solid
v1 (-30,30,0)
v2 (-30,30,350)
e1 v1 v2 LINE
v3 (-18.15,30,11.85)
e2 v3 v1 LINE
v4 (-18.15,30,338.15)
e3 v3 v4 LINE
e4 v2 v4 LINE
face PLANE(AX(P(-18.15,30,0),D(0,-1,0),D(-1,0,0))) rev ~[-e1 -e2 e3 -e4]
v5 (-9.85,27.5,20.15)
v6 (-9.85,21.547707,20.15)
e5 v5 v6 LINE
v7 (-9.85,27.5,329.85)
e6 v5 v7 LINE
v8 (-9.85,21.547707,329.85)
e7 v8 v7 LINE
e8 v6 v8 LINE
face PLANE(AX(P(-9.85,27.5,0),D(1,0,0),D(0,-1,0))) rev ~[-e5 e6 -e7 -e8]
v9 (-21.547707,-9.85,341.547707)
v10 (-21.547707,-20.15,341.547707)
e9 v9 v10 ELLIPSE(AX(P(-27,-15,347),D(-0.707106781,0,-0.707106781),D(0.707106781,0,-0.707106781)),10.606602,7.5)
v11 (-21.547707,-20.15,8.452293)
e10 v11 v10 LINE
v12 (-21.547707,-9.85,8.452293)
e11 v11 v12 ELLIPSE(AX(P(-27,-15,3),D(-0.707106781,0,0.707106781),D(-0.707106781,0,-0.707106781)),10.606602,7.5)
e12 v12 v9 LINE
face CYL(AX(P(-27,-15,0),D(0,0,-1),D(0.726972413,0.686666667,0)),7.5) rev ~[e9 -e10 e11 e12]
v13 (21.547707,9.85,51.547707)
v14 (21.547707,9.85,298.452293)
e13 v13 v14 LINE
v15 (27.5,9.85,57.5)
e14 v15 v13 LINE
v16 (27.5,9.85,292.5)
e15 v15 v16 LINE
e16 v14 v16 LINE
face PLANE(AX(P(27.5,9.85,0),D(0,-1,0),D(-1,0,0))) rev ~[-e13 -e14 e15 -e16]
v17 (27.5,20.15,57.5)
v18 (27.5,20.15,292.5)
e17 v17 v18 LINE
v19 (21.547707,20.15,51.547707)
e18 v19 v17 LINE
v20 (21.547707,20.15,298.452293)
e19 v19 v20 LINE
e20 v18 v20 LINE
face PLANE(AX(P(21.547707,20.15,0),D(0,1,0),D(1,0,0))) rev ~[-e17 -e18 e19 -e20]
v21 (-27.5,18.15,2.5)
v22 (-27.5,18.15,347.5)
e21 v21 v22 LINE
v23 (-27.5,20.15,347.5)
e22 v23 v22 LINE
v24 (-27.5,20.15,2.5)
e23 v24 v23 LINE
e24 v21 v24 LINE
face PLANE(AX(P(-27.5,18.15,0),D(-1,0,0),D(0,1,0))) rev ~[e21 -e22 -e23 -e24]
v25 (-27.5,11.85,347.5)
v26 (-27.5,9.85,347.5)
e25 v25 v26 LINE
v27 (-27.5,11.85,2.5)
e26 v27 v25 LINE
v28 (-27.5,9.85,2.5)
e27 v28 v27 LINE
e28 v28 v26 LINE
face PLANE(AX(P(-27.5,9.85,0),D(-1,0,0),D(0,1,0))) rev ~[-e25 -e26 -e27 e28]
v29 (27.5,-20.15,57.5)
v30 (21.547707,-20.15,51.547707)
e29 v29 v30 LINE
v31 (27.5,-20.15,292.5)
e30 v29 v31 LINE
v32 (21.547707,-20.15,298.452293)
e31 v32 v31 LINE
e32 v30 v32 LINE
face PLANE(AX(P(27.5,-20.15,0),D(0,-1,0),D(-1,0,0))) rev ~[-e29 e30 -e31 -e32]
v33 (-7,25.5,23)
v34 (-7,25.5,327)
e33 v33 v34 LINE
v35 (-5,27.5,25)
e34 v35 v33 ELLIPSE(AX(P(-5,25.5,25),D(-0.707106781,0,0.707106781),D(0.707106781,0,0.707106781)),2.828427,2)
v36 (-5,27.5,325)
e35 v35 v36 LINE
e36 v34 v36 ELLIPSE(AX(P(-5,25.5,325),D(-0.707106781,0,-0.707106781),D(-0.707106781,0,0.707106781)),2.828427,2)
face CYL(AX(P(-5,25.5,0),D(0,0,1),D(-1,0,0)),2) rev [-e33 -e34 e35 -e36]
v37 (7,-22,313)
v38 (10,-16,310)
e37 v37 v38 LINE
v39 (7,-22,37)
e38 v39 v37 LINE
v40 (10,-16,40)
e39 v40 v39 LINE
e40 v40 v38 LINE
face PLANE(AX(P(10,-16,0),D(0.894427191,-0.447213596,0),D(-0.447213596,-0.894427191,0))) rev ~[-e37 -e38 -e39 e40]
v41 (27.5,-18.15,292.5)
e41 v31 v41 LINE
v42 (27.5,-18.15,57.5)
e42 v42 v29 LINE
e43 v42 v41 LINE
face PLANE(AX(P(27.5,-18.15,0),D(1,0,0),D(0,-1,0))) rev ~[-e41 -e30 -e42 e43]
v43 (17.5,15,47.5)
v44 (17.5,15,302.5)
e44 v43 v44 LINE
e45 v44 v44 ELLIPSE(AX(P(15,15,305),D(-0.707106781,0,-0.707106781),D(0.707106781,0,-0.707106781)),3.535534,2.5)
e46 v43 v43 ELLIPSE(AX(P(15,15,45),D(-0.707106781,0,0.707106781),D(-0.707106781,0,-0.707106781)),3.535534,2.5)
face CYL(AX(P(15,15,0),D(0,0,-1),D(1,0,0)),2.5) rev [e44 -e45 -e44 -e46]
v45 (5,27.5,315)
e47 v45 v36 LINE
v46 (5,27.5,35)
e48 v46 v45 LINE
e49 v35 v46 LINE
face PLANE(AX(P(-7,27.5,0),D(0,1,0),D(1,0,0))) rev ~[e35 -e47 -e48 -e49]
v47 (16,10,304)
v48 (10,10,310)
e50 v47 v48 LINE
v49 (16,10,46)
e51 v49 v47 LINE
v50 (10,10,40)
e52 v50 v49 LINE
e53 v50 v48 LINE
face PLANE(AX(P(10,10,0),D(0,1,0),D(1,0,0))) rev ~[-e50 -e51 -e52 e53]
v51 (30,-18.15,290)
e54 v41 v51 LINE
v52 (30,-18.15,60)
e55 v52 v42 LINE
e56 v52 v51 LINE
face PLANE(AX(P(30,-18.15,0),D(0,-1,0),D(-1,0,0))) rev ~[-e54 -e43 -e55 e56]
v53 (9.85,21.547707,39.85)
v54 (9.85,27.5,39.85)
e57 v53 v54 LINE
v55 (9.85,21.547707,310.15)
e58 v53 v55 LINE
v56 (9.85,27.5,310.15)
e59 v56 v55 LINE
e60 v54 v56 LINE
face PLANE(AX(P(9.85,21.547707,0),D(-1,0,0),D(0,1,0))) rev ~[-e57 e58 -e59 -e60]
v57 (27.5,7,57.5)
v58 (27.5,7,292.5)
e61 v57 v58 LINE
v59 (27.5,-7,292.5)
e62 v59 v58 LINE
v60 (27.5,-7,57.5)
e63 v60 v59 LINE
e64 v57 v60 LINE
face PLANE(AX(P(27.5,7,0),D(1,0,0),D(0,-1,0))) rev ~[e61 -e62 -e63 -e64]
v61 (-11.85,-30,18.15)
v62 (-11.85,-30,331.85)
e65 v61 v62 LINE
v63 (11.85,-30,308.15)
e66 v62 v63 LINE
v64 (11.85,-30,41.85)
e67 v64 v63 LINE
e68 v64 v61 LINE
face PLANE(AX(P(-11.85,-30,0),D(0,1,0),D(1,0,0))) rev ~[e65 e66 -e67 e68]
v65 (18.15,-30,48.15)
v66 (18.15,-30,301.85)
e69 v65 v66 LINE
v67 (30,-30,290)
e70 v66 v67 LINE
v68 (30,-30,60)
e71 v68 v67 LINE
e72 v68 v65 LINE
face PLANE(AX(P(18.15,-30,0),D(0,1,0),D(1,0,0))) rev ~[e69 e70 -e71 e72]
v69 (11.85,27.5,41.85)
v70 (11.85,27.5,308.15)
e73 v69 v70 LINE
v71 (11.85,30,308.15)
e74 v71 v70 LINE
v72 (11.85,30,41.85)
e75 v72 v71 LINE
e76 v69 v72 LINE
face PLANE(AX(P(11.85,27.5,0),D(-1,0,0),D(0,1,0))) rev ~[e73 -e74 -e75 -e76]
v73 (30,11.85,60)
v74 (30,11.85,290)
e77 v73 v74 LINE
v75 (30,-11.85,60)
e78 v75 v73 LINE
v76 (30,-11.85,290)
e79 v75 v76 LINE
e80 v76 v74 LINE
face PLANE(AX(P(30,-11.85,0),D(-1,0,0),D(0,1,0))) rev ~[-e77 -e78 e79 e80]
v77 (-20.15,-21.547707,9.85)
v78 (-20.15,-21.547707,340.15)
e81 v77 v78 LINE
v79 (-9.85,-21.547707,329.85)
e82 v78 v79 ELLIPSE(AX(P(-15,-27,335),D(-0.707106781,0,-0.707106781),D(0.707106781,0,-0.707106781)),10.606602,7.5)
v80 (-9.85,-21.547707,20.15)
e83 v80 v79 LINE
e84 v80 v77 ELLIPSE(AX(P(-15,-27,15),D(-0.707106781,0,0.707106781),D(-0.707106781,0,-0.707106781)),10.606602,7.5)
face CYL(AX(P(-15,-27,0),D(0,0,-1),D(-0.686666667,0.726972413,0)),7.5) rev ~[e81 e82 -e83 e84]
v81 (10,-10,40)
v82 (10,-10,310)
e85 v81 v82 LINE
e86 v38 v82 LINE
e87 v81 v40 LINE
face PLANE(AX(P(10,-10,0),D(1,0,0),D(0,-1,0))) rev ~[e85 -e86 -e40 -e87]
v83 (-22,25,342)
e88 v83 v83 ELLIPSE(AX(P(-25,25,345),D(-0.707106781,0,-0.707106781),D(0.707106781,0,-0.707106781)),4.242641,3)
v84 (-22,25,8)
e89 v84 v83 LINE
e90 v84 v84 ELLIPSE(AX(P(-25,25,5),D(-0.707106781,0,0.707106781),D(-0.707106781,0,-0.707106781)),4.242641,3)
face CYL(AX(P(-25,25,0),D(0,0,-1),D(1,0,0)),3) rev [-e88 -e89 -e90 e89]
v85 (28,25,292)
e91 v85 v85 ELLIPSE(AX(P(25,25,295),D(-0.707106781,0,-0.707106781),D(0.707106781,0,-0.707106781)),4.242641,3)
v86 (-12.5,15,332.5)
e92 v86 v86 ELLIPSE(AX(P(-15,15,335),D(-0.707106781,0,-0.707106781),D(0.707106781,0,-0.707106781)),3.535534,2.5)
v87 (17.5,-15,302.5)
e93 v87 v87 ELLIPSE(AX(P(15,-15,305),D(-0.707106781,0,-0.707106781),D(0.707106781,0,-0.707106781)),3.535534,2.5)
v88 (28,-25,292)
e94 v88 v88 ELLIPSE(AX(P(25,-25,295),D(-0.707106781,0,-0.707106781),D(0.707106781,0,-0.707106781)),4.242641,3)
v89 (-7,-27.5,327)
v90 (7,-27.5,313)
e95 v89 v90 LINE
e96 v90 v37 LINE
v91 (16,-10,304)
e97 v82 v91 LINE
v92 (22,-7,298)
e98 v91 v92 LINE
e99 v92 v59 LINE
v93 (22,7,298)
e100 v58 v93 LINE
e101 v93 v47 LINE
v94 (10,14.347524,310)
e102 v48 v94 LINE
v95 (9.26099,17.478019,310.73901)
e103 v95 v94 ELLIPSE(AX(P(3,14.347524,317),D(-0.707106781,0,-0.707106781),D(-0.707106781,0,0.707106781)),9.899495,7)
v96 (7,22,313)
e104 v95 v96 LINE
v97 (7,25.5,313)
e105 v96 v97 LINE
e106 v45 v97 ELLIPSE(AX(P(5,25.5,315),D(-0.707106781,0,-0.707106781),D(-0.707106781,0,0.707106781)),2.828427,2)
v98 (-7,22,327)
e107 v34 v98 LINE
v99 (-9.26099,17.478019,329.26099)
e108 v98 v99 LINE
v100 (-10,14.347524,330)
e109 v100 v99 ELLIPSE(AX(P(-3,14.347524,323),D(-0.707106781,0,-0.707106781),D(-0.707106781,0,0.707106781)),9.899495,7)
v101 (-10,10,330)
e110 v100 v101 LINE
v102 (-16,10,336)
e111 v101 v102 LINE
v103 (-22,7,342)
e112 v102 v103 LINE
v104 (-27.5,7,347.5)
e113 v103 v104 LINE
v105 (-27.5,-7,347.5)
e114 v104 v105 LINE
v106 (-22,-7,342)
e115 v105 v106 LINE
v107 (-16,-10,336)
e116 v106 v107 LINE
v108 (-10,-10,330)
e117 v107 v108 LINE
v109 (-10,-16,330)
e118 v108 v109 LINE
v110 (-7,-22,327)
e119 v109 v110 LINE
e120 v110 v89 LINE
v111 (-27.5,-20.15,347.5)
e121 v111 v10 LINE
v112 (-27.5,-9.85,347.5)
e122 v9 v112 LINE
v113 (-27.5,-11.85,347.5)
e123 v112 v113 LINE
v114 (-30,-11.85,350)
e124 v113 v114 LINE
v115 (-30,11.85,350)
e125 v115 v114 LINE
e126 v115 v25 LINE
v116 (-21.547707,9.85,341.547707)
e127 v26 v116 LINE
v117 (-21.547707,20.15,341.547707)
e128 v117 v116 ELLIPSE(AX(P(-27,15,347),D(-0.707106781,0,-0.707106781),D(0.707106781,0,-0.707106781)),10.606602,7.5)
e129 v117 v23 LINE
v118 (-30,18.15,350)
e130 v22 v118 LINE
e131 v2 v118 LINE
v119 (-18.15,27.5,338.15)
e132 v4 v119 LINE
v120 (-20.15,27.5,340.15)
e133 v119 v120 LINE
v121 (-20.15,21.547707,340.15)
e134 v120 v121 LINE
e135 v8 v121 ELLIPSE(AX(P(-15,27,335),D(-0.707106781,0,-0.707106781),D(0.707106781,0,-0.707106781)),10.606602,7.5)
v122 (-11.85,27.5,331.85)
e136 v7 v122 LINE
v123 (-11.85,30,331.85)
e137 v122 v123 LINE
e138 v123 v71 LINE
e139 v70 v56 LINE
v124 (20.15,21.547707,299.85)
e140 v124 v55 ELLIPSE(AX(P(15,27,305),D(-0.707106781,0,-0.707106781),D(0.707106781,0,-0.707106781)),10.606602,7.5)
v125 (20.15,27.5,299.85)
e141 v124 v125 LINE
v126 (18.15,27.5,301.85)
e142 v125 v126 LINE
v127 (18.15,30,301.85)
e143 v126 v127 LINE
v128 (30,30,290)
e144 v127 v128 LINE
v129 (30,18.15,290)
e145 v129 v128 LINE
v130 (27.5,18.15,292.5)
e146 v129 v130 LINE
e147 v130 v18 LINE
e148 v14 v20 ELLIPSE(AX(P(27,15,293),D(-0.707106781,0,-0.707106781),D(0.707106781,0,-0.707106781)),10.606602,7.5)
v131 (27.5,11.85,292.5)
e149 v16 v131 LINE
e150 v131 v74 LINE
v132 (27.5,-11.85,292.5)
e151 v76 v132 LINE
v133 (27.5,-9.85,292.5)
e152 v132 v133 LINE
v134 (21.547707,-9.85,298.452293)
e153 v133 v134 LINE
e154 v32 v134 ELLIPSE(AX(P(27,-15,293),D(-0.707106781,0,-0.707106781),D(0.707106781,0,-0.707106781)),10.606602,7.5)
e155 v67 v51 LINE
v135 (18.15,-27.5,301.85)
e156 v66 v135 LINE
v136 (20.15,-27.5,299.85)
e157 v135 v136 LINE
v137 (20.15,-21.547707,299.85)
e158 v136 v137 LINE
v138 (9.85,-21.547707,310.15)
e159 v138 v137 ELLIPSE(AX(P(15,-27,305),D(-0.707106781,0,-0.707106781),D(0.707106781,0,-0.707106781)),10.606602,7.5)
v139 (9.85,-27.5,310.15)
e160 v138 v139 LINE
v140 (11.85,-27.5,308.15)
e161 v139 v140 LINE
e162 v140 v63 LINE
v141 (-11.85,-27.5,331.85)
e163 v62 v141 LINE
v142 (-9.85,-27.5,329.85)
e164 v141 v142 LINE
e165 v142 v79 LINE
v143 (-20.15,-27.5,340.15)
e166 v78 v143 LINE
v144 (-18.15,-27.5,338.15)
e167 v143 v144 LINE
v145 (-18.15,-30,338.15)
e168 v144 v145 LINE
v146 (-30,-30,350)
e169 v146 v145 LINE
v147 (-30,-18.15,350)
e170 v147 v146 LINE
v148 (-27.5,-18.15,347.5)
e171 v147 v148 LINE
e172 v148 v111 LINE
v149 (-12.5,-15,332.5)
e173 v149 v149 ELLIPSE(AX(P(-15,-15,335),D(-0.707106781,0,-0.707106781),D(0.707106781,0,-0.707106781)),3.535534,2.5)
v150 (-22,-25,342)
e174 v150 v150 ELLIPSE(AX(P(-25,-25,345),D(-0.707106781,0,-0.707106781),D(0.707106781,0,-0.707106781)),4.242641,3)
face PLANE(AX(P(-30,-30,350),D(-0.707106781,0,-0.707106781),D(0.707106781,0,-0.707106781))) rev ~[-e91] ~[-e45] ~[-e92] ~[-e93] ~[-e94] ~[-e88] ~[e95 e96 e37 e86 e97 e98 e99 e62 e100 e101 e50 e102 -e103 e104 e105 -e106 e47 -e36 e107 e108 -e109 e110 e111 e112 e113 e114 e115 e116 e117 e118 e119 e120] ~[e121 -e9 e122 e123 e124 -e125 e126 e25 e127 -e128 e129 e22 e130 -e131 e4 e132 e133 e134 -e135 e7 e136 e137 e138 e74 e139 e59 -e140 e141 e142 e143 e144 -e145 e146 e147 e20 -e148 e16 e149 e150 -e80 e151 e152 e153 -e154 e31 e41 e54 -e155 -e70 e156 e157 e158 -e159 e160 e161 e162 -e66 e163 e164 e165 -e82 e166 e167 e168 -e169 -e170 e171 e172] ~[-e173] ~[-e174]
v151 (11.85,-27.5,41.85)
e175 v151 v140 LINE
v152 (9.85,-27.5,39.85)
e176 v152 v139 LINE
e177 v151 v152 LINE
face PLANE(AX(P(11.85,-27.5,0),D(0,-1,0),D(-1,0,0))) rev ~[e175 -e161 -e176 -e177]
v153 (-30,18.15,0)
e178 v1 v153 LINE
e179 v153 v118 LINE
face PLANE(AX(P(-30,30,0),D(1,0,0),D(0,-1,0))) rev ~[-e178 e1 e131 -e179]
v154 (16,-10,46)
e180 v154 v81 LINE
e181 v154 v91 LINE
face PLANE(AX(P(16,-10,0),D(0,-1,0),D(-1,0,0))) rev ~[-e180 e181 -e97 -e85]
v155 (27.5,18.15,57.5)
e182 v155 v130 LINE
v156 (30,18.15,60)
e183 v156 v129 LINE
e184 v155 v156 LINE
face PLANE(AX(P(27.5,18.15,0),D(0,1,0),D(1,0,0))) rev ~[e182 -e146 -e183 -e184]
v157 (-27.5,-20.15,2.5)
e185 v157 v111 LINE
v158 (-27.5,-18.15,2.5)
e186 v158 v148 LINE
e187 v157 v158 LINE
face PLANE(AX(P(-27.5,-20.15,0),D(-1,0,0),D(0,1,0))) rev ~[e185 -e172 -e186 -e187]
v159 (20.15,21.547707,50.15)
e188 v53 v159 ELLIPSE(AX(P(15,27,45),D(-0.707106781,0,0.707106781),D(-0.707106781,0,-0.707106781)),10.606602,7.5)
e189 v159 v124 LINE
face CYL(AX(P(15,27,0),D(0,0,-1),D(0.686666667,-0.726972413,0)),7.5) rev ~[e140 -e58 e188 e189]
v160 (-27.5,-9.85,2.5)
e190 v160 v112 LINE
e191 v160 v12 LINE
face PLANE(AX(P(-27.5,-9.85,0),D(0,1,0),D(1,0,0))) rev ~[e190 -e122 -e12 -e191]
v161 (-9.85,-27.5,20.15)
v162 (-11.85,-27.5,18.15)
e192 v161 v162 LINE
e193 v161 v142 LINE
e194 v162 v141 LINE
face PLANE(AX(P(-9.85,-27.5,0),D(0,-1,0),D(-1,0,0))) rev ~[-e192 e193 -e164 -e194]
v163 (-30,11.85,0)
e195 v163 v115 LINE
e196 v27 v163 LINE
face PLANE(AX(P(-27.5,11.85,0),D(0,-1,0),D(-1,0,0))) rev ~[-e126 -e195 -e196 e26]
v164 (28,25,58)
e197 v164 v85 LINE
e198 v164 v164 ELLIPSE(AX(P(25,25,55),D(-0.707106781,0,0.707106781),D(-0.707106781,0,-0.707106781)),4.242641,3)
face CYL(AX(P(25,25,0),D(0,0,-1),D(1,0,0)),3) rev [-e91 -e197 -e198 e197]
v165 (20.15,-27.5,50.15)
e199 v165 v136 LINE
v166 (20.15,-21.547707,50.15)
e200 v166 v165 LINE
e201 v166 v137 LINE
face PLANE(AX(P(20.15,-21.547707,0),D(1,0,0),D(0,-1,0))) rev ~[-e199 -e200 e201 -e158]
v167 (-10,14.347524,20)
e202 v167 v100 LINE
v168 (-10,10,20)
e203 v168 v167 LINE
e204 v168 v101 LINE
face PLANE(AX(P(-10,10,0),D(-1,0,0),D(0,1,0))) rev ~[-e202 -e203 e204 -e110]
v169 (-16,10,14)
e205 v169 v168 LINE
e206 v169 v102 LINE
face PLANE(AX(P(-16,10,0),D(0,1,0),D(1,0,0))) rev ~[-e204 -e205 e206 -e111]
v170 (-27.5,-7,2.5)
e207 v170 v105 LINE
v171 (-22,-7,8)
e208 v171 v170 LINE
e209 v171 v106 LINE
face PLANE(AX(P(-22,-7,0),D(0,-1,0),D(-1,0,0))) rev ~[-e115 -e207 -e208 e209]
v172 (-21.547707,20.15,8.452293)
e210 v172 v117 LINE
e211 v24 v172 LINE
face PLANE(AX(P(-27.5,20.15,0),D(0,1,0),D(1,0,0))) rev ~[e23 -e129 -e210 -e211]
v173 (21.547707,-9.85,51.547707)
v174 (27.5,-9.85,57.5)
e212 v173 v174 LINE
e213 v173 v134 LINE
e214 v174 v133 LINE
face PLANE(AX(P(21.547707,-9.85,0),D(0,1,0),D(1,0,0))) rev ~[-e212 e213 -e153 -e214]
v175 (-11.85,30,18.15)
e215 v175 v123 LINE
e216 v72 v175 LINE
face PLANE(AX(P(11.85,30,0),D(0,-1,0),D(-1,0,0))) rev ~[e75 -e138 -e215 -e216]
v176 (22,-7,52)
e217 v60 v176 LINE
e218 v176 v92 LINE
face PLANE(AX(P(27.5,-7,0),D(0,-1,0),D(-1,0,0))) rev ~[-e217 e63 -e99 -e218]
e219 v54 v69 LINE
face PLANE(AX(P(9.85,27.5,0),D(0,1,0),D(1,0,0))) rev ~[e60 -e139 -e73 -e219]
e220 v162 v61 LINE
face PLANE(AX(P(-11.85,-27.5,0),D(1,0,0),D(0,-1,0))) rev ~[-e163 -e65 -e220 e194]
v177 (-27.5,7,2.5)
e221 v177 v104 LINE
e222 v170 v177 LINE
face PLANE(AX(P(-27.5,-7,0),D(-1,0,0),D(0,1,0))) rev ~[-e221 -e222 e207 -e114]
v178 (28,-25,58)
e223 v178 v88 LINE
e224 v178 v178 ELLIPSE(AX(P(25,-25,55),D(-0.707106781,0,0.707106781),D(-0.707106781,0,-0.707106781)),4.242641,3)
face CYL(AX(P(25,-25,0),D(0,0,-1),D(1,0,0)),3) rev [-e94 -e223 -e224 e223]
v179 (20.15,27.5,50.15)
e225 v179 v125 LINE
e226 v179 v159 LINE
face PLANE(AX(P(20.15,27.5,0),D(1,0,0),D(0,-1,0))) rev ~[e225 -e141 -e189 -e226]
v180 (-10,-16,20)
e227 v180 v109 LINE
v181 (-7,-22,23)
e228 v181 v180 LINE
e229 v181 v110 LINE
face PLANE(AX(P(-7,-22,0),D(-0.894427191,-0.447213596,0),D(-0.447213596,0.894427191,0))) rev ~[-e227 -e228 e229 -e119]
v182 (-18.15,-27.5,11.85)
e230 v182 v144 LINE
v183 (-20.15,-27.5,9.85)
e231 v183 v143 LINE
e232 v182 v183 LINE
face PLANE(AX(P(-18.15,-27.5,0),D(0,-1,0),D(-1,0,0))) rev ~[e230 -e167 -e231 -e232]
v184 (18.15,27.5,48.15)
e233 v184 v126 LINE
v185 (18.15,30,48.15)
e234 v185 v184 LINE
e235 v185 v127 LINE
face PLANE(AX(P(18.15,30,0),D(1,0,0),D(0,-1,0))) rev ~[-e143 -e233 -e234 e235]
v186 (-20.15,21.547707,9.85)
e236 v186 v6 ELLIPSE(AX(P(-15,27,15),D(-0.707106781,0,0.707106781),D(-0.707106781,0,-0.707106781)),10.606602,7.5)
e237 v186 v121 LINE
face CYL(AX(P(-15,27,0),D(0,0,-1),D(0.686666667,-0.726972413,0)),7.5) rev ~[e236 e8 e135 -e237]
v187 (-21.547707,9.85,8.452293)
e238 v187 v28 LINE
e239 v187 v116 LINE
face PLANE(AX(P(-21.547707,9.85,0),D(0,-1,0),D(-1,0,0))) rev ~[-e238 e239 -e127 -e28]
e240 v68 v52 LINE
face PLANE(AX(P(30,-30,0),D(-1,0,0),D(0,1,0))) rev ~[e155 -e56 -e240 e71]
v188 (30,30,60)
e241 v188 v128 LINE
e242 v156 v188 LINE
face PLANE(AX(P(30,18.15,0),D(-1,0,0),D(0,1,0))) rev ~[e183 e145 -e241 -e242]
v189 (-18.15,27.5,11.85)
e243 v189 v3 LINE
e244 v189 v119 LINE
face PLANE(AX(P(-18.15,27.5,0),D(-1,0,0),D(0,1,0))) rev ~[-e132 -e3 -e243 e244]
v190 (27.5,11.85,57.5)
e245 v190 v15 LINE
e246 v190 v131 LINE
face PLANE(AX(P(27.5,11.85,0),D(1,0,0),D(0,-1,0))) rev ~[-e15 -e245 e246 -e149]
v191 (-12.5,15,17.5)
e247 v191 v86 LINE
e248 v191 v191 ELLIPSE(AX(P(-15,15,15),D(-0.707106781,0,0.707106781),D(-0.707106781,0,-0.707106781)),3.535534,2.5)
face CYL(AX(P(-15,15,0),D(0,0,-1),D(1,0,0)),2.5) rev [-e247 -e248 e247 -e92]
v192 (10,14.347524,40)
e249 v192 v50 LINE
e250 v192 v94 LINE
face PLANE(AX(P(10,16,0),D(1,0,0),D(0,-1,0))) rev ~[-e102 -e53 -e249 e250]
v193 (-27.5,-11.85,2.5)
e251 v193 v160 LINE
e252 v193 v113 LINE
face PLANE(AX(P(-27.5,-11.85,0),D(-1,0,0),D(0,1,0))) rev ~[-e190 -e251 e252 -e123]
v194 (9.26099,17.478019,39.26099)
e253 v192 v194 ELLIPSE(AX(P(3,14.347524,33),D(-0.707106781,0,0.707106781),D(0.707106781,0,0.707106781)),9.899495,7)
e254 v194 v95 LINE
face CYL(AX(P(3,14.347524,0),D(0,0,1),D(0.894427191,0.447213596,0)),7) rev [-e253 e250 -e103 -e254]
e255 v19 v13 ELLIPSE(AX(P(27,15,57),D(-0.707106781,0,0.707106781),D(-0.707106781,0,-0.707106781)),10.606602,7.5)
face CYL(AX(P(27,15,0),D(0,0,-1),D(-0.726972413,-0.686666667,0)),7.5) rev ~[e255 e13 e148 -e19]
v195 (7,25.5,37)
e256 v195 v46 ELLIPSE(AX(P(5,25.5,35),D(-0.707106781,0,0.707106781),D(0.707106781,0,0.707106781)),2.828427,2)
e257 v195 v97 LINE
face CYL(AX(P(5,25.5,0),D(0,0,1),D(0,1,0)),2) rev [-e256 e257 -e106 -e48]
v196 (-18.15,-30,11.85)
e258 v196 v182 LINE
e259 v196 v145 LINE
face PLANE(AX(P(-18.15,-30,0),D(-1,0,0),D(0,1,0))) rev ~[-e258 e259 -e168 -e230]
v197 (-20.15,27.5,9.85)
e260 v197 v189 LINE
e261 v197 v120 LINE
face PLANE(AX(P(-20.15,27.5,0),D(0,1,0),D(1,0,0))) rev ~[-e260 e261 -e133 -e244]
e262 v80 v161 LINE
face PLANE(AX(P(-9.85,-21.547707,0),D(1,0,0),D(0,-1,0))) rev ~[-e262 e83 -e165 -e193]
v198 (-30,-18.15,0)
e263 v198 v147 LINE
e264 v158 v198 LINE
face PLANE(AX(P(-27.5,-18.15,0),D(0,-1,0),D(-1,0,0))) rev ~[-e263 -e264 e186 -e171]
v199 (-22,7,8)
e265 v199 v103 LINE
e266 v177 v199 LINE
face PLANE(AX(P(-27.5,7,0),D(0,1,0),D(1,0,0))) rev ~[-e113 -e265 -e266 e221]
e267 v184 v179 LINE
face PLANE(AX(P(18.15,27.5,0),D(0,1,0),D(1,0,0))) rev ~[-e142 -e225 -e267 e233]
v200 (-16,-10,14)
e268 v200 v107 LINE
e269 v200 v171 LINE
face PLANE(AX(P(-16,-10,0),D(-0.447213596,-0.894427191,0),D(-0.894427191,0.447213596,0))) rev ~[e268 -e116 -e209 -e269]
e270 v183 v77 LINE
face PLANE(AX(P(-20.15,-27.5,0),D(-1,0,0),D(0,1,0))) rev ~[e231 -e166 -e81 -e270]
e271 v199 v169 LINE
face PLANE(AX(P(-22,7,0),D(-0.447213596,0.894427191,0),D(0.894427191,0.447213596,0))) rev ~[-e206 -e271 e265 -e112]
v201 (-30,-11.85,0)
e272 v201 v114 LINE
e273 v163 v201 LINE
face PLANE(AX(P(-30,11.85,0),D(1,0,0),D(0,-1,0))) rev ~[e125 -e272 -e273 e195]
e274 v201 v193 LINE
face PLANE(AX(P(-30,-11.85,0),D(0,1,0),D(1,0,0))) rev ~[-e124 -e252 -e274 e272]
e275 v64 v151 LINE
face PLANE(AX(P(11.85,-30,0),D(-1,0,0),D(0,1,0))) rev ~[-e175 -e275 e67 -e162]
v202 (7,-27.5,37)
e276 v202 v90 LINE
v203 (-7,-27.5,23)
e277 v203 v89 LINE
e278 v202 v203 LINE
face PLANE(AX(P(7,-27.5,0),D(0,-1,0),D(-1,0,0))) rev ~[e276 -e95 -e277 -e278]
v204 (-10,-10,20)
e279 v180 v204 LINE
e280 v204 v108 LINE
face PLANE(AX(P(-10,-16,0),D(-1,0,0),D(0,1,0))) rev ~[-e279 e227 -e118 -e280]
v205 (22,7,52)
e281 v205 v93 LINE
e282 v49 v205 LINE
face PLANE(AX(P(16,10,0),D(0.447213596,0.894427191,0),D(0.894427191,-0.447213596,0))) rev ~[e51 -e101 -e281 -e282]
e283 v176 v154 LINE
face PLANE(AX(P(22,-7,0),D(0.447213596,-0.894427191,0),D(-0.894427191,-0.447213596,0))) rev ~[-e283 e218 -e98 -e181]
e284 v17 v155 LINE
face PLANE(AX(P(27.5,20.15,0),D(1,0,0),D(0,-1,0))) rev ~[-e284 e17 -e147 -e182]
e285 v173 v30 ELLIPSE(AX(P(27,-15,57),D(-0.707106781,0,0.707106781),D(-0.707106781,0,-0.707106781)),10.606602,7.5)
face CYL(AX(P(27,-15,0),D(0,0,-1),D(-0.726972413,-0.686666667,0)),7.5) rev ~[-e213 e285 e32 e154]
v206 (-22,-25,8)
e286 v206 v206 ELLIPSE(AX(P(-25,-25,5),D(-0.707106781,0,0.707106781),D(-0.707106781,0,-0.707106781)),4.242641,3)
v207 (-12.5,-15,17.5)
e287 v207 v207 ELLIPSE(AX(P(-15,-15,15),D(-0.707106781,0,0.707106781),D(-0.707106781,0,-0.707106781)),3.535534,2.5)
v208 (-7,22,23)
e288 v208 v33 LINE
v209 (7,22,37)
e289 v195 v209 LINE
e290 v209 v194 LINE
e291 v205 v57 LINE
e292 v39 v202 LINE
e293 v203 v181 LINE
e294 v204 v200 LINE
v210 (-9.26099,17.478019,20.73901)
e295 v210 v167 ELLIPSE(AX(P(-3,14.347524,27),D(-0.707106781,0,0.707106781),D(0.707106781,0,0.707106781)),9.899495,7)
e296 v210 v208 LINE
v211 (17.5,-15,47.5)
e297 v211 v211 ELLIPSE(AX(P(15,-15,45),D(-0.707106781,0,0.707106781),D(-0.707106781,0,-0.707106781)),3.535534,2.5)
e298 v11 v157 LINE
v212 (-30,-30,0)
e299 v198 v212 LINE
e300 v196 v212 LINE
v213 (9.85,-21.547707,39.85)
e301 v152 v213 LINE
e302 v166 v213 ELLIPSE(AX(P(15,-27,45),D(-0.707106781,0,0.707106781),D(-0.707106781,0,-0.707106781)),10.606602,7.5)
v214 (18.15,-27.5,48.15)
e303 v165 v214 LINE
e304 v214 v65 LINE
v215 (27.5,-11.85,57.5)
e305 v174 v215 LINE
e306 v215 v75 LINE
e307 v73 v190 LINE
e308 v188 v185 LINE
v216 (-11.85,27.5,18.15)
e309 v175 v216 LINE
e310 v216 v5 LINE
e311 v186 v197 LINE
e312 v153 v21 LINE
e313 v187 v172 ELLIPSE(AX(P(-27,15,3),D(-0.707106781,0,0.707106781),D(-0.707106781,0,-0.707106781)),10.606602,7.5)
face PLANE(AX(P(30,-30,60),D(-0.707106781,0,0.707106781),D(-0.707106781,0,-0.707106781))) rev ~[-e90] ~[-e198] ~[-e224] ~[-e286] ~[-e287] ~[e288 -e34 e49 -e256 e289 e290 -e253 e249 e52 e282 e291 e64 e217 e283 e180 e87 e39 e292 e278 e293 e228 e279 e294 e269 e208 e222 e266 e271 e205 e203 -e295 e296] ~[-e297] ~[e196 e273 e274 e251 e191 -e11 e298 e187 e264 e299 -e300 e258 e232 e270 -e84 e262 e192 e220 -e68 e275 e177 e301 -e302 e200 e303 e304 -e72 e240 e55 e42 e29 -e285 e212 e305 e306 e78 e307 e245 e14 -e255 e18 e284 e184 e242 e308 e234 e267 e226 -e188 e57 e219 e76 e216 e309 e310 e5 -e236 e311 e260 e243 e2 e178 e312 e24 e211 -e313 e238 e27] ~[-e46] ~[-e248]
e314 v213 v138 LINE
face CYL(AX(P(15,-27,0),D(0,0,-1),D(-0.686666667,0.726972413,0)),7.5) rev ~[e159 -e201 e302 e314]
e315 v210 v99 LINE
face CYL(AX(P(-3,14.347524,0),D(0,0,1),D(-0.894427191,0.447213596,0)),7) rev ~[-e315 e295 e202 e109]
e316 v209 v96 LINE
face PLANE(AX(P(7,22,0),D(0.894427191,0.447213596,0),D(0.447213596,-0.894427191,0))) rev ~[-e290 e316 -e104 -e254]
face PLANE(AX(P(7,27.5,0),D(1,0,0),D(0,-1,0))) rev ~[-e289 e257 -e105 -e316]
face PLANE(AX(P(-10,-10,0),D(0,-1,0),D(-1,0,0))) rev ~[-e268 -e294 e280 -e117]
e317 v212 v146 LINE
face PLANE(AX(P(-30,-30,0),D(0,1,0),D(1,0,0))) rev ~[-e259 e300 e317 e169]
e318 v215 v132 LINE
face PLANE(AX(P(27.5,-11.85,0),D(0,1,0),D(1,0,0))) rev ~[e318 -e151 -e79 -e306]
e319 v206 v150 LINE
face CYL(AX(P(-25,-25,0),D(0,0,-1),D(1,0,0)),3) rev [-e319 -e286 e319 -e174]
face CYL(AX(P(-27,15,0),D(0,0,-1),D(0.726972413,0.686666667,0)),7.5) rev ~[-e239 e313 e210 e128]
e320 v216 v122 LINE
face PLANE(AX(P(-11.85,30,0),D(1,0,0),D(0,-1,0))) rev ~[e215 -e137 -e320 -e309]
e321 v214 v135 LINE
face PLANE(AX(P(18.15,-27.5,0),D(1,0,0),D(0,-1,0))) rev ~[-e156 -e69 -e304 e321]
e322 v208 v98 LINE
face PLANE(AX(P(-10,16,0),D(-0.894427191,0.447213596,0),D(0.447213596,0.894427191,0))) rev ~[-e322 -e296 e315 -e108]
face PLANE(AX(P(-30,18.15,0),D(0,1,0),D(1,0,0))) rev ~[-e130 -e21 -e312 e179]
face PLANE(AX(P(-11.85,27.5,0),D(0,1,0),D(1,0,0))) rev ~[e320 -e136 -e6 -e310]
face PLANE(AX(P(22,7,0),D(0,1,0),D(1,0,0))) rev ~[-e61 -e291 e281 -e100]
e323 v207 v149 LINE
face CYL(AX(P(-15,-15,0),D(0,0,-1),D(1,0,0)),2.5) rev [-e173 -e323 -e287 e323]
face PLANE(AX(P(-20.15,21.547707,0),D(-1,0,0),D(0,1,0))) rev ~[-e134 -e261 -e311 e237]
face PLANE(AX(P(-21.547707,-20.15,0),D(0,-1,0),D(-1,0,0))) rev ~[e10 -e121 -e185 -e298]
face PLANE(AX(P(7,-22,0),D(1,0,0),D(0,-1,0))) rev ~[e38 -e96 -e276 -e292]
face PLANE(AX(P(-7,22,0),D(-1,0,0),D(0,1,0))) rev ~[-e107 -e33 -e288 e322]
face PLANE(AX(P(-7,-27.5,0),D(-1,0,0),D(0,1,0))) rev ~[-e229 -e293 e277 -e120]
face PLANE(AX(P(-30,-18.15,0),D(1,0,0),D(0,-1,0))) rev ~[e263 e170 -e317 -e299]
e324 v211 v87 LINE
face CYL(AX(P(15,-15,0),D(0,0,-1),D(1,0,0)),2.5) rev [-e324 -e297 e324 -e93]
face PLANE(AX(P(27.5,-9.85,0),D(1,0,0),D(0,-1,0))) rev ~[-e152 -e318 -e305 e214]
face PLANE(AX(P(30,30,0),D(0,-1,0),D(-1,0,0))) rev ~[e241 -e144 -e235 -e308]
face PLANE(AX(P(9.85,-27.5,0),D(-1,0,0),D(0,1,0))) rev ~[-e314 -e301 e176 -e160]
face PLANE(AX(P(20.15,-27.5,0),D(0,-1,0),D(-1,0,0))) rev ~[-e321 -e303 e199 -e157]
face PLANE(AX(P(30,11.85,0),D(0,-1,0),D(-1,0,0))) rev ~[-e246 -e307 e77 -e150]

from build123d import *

# Parameters (mm, degrees)
F0_R     = 3
F0_R_2   = 2.5
F1_DEPTH = 350
F2_R     = 2
F3_R     = 7
F5_DEPTH = 60


# Not quite as in the source:
# - a feature names something its author has since deleted; it is built from what else it names


with BuildPart() as f1:
    # F0 (on Top) → F1 (new body)
    with BuildSketch(Plane.XY):
        with BuildLine():
            Line((18.15, -30), (30, -30))
            Line((30, -30), (30, -18.15))
            Line((30, -18.15), (27.5, -18.15))
            Line((27.5, -18.15), (27.5, -20.15))
            Line((27.5, -20.15), (21.5477069044, -20.15))
            ThreePointArc((21.5477069044, -20.15), (19.5, -15), (21.5477069044, -9.85))
            Line((21.5477069044, -9.85), (27.5, -9.85))
            Line((27.5, -9.85), (27.5, -11.85))
            Line((27.5, -11.85), (30, -11.85))
            Line((30, -11.85), (30, 11.85))
            Line((30, 11.85), (27.5, 11.85))
            Line((27.5, 11.85), (27.5, 9.85))
            Line((27.5, 9.85), (21.5477069044, 9.85))
            ThreePointArc((21.5477069044, 9.85), (19.5, 15), (21.5477069044, 20.15))
            Line((21.5477069044, 20.15), (27.5, 20.15))
            Line((27.5, 20.15), (27.5, 18.15))
            Line((27.5, 18.15), (30, 18.15))
            Line((30, 18.15), (30, 30))
            Line((30, 30), (18.15, 30))
            Line((18.15, 30), (18.15, 27.5))
            Line((18.15, 27.5), (20.15, 27.5))
            Line((20.15, 27.5), (20.15, 21.5477069044))
            ThreePointArc((20.15, 21.5477069044), (15, 19.5), (9.85, 21.5477069044))
            Line((9.85, 21.5477069044), (9.85, 27.5))
            Line((9.85, 27.5), (11.85, 27.5))
            Line((11.85, 27.5), (11.85, 30))
            Line((11.85, 30), (-11.85, 30))
            Line((-11.85, 30), (-11.85, 27.5))
            Line((-11.85, 27.5), (-9.85, 27.5))
            Line((-9.85, 27.5), (-9.85, 21.5477069044))
            ThreePointArc((-9.85, 21.5477069044), (-15, 19.5), (-20.15, 21.5477069044))
            Line((-20.15, 21.5477069044), (-20.15, 27.5))
            Line((-20.15, 27.5), (-18.15, 27.5))
            Line((-18.15, 27.5), (-18.15, 30))
            Line((-18.15, 30), (-30, 30))
            Line((-30, 30), (-30, 18.15))
            Line((-30, 18.15), (-27.5, 18.15))
            Line((-27.5, 18.15), (-27.5, 20.15))
            Line((-27.5, 20.15), (-21.5477069044, 20.15))
            ThreePointArc((-21.5477069044, 20.15), (-19.5, 15), (-21.5477069044, 9.85))
            Line((-21.5477069044, 9.85), (-27.5, 9.85))
            Line((-27.5, 9.85), (-27.5, 11.85))
            Line((-27.5, 11.85), (-30, 11.85))
            Line((-30, 11.85), (-30, -11.85))
            Line((-30, -11.85), (-27.5, -11.85))
            Line((-27.5, -11.85), (-27.5, -9.85))
            Line((-27.5, -9.85), (-21.5477069044, -9.85))
            ThreePointArc((-21.5477069044, -9.85), (-19.5, -15), (-21.5477069044, -20.15))
            Line((-21.5477069044, -20.15), (-27.5, -20.15))
            Line((-27.5, -20.15), (-27.5, -18.15))
            Line((-27.5, -18.15), (-30, -18.15))
            Line((-30, -18.15), (-30, -30))
            Line((-30, -30), (-18.15, -30))
            Line((-18.15, -30), (-18.15, -27.5))
            Line((-18.15, -27.5), (-20.15, -27.5))
            Line((-20.15, -27.5), (-20.15, -21.5477069044))
            ThreePointArc((-20.15, -21.5477069044), (-15, -19.5), (-9.85, -21.5477069044))
            Line((-9.85, -21.5477069044), (-9.85, -27.5))
            Line((-9.85, -27.5), (-11.85, -27.5))
            Line((-11.85, -27.5), (-11.85, -30))
            Line((-11.85, -30), (11.85, -30))
            Line((11.85, -30), (11.85, -27.5))
            Line((11.85, -27.5), (9.85, -27.5))
            Line((9.85, -27.5), (9.85, -21.5477069044))
            ThreePointArc((9.85, -21.5477069044), (15, -19.5), (20.15, -21.5477069044))
            Line((20.15, -21.5477069044), (20.15, -27.5))
            Line((20.15, -27.5), (18.15, -27.5))
            Line((18.15, -27.5), (18.15, -30))
        make_face()
        with Locations((-25, -25)):
            Circle(F0_R, mode=Mode.SUBTRACT)
        with Locations((-15, -15)):
            Circle(F0_R_2, mode=Mode.SUBTRACT)
        with Locations((25, -25)):
            Circle(F0_R, mode=Mode.SUBTRACT)
        with Locations((15, -15)):
            Circle(F0_R_2, mode=Mode.SUBTRACT)
        with Locations((-25, 25)):
            Circle(F0_R, mode=Mode.SUBTRACT)
        with Locations((-15, 15)):
            Circle(F0_R_2, mode=Mode.SUBTRACT)
        Polygon((-7, 22), (-7, 27.5), (0, 27.5), (7, 27.5), (7, 22), (10, 16), (10, 10), (16, 10), (22, 7), (27.5, 7), (27.5, 0), (27.5, -7), (22, -7), (16, -10), (10, -10), (10, -16), (7, -22), (7, -27.5), (0, -27.5), (-7, -27.5), (-7, -22), (-10, -16), (-10, -10), (-16, -10), (-22, -7), (-27.5, -7), (-27.5, 0), (-27.5, 7), (-22, 7), (-16, 10), (-10, 10), (-10, 16), align=None, mode=Mode.SUBTRACT)
        with Locations((15, 15)):
            Circle(F0_R_2, mode=Mode.SUBTRACT)
        with Locations((25, 25)):
            Circle(F0_R, mode=Mode.SUBTRACT)
    extrude(amount=F1_DEPTH)

    # F2
    f2_edges = [f1.edges().sort_by_distance(p)[0] for p in [
        (-7, 27.5, 175),
        (7, 27.5, 175),
    ]]
    fillet(f2_edges, radius=F2_R)

    # F3
    f3_edges = [f1.edges().sort_by_distance(p)[0] for p in [
        (-10, 16, 175),
        (10, 16, 175),
    ]]
    fillet(f3_edges, radius=F3_R)

    # F4 (on face) → F5 (cut)
    with BuildSketch(Plane.XZ.offset(30)):
        Polygon((30, 0), (30, 60), (-30, 0), (-18.15, 0), align=None)
        Polygon((30, 290), (30, 350), (-18.15, 350), (-30, 350), align=None)
    extrude(amount=-F5_DEPTH, mode=Mode.SUBTRACT)


solid = f1.part
